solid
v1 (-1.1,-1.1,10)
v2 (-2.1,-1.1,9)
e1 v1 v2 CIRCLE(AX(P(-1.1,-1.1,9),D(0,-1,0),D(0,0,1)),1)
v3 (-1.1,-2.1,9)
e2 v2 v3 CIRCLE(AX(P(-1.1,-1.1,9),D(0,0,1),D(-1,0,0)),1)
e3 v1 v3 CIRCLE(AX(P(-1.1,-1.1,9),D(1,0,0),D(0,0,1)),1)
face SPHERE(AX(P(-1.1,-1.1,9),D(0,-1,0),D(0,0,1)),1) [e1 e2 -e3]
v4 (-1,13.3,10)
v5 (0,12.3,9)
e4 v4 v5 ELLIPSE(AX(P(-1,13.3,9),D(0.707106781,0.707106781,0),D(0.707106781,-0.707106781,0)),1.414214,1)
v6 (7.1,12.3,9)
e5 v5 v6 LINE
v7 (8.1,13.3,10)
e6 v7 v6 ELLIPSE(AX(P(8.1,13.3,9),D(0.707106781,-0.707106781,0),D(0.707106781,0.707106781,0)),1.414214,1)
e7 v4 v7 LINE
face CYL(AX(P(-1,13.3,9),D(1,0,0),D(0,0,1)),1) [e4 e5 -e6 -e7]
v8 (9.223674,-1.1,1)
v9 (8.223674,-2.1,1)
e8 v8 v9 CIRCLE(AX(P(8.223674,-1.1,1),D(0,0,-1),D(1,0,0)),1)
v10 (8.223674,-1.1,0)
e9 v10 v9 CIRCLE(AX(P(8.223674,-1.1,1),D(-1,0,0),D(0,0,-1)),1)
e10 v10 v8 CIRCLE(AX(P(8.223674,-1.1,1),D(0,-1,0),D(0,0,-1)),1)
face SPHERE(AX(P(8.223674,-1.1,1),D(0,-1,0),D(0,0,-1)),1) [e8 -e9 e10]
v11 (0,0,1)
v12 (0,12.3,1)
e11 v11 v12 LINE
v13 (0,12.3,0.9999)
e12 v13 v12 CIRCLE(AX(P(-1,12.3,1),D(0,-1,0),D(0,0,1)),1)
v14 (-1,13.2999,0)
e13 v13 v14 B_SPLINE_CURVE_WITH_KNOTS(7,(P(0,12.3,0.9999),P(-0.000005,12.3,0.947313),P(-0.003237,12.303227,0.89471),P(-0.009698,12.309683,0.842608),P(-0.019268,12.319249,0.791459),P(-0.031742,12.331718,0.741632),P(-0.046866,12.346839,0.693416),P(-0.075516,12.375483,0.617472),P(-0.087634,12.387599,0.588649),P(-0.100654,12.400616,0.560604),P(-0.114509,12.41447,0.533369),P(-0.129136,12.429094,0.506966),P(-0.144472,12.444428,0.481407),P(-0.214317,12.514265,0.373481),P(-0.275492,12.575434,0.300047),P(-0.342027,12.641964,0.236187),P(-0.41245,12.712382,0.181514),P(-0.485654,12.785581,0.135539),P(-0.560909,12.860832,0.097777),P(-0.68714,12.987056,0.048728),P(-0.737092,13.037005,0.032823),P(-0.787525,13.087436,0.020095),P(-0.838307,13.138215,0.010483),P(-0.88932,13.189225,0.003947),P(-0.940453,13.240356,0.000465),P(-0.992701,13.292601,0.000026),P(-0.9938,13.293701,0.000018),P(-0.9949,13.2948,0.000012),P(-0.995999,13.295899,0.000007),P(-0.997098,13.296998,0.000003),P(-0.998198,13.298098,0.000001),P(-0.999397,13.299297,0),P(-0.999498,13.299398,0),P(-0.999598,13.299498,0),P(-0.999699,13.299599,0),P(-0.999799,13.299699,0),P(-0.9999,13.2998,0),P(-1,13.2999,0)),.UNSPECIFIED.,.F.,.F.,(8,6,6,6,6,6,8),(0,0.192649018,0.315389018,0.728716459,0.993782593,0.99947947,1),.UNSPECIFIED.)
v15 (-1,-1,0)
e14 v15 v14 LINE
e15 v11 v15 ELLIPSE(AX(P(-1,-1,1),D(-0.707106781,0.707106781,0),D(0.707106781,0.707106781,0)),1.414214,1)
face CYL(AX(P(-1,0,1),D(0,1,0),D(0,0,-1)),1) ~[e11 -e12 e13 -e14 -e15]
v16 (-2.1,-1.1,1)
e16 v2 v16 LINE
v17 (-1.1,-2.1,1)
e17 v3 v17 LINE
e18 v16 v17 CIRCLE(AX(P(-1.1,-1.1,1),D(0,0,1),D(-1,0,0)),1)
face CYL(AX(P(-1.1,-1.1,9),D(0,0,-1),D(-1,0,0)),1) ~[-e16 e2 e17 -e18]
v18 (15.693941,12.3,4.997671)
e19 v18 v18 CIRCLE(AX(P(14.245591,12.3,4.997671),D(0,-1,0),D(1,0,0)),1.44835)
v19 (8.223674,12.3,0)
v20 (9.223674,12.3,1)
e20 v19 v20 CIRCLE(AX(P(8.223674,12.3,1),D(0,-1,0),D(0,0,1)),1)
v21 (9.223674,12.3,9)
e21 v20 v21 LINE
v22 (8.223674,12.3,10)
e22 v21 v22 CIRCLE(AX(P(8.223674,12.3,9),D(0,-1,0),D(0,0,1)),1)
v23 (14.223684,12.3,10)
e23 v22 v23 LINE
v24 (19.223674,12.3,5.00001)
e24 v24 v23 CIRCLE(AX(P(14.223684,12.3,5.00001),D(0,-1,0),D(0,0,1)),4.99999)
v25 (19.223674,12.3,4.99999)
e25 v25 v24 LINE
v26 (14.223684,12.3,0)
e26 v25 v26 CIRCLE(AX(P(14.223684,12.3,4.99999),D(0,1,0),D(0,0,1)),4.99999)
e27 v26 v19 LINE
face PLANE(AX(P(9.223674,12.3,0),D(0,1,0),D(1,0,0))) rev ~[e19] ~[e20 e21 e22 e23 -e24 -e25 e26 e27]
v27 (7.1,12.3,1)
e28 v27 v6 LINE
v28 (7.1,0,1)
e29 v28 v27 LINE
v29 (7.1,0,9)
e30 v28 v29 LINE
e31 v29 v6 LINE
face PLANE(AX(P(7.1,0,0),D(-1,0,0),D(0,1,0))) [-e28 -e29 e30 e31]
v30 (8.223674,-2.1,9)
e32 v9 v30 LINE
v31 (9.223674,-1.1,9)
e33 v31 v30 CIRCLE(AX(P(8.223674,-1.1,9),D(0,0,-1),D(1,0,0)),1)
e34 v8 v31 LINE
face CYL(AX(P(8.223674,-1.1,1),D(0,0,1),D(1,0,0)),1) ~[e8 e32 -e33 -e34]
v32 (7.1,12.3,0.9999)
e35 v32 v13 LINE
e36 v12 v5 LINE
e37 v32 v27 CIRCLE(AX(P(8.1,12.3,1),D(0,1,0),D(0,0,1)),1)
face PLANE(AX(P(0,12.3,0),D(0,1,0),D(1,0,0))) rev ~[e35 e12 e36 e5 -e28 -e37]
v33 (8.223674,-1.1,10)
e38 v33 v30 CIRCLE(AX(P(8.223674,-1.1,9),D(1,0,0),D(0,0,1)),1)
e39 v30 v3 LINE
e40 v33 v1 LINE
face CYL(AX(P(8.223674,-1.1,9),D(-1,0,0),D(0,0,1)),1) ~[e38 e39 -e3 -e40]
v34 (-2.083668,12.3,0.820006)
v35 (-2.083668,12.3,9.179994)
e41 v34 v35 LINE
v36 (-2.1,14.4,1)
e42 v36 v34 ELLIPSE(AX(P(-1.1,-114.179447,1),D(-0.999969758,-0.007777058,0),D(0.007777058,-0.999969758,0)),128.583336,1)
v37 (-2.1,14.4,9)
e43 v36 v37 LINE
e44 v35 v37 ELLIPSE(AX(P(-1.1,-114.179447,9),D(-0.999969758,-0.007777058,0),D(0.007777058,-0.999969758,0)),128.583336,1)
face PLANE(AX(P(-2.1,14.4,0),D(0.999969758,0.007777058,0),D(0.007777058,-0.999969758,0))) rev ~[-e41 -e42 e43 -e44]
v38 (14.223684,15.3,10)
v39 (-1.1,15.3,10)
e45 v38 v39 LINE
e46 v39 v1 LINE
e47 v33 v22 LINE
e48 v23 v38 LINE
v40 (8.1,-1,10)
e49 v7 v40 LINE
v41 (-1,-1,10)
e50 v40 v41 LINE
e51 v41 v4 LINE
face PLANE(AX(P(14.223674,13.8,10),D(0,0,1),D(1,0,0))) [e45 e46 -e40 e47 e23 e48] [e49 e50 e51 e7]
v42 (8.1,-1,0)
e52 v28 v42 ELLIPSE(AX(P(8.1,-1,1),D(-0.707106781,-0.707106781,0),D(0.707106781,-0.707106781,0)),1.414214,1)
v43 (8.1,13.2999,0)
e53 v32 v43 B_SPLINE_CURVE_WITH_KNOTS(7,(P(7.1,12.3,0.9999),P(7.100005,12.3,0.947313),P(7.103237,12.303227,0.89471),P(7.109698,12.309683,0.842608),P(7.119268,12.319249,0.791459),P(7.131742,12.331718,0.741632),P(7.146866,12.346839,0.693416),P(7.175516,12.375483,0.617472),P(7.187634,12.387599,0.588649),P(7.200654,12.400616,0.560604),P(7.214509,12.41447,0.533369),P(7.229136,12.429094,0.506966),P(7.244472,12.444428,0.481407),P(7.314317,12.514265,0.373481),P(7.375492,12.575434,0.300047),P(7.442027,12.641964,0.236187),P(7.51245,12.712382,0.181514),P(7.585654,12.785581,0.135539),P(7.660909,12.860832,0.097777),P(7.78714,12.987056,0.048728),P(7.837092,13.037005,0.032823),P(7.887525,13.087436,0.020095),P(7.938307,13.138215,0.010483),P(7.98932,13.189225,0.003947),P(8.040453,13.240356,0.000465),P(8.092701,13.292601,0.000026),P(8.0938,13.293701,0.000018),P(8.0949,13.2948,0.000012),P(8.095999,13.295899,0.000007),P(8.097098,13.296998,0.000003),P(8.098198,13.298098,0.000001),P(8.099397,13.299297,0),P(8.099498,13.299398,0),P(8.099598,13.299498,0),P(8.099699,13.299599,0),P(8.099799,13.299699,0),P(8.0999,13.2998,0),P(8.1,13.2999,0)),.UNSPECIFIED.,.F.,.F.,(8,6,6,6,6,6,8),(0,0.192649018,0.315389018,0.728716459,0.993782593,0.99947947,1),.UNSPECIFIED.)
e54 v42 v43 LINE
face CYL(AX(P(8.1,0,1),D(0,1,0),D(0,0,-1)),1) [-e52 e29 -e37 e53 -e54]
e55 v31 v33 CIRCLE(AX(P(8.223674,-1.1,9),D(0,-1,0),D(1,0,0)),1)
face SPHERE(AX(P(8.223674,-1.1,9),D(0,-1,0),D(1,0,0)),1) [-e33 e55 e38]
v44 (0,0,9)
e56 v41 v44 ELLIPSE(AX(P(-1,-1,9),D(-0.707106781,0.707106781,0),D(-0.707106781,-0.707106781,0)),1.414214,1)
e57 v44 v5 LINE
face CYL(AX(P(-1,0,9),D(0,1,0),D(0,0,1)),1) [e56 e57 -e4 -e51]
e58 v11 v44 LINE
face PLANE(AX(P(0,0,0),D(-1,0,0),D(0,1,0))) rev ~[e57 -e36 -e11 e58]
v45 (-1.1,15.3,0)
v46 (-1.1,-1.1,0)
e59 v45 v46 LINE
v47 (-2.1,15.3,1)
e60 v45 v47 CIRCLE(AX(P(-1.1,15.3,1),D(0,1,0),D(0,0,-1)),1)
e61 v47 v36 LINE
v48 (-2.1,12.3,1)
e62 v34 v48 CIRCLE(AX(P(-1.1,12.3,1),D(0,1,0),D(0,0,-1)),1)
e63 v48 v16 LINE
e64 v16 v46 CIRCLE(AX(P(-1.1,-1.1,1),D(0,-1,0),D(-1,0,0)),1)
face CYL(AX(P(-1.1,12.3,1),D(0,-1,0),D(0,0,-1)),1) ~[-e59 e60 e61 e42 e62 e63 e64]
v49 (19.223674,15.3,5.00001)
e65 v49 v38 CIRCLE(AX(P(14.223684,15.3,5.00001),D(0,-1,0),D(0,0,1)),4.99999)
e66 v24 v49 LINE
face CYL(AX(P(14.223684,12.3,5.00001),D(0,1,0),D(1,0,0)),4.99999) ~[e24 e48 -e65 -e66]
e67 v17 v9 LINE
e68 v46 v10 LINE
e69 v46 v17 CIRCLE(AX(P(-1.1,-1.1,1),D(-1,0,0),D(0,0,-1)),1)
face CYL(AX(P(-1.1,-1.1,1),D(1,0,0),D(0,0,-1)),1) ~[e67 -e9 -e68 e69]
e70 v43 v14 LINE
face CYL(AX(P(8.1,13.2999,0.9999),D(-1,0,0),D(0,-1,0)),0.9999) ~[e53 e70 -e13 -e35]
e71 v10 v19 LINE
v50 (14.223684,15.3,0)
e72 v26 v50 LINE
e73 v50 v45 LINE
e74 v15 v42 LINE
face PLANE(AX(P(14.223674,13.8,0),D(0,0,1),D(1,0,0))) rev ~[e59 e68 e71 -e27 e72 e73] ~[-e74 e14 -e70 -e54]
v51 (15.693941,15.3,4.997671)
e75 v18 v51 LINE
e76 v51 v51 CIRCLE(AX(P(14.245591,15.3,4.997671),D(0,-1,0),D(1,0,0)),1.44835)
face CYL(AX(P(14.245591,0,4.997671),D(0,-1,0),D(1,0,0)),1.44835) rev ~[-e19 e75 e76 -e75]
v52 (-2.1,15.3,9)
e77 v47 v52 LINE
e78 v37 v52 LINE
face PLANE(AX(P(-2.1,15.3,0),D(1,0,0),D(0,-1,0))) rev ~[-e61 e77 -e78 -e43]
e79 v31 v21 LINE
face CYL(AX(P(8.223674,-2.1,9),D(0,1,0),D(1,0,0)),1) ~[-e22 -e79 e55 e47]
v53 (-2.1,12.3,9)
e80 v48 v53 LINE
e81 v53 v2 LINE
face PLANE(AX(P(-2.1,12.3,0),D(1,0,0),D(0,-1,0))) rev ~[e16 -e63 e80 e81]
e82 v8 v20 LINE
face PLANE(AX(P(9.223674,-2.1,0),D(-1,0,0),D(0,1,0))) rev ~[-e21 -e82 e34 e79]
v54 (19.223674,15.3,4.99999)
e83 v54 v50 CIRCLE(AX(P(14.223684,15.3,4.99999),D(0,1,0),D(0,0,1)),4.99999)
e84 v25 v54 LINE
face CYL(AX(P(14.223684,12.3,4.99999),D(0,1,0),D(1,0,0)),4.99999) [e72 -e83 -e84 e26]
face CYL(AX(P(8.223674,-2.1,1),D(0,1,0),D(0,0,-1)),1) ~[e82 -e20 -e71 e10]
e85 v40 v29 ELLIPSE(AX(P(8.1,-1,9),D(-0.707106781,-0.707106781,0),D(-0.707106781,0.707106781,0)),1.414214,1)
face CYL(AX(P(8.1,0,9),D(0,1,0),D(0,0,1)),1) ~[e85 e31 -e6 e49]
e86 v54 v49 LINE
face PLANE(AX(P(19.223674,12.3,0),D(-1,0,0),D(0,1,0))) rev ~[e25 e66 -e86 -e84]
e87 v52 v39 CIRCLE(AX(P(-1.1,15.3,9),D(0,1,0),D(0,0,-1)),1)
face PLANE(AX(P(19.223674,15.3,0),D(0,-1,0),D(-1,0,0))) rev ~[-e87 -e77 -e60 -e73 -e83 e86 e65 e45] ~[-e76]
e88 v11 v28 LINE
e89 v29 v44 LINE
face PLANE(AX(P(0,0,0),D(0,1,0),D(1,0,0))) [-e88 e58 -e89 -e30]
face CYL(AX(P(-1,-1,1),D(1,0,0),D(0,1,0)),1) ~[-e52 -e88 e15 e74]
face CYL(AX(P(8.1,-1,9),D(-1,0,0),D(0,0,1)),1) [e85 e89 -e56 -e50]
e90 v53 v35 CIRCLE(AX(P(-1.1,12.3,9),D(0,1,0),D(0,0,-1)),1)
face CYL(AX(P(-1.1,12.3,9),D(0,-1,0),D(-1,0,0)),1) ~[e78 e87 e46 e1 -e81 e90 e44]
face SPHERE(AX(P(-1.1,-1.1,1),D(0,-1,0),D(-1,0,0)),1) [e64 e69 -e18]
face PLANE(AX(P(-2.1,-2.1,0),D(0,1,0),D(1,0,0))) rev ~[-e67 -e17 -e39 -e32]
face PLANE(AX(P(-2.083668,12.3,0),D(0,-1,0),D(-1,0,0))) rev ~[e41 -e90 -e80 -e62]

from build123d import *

# Parameters (mm, degrees)
F0_W      = 10
F0_H      = 3
F0_W_2    = 7.1
F0_H_2    = 12.3
F1_DEPTH  = 10
F2_R      = 1.4483503842
F1_FACE_W = 21.323674424
F1_FACE_H = 10
F3_DEPTH  = 15.301
F4_R      = 4.99999
F5_F1_R   = 1
F5_F2_R   = 1
F5_F3_R   = 1
F5_F4_R   = 1
F5_F5_R   = 1
F5_F6_R   = 1
F5_F7_R   = 1
F5_F8_R   = 1
F5_F9_R   = 1
F5_F10_R  = 0.9999
F5_F11_R  = 1
F5_F12_R  = 1
F5_F13_R  = 1


# Not quite as in the source:
# - a fillet or chamfer is up to 0.001 mm smaller than in the source, because OpenCascade refuses the exact size


with BuildPart() as f1:
    # F0 (on Top) → F1 (new body)
    with BuildSketch(Plane.XY):
        with Locations((14.223674424, 13.8)):
            Rectangle(F0_W, F0_H)
        Polygon((-2.1, 12.3), (-2.1, 0), (-2.1, -2.1), (7.1, -2.1), (9.223674424, -2.1), (9.223674424, 12.3), (9.223674424, 15.3), (-2.1, 15.3), (-2.1, 14.4), (-2.0836676853, 12.3), align=None)
        with Locations((3.55, 6.15)):
            Rectangle(F0_W_2, F0_H_2, mode=Mode.SUBTRACT)
    extrude(amount=F1_DEPTH)

    # F2 (on Front) + F1_face (on face) → F3 (cut, through all)
    with BuildSketch(Plane.XZ):
        with Locations((14.2455906607, 4.9976706505)):
            Circle(F2_R)
    with BuildSketch(Plane(origin=(8.561837212, 15.3, 5), x_dir=(-1, 0, 0), z_dir=(0, 1, 0))):
        Rectangle(F1_FACE_W, F1_FACE_H)
    extrude(amount=-F3_DEPTH, dir=(0, -1, 0), mode=Mode.SUBTRACT)

    # F4 (radius 5 in the source; OpenCascade refuses exactly that, so slightly less here)
    f4_edges = [f1.edges().sort_by_distance(p)[0] for p in [
        (19.223674, 13.8, 10),
        (19.223674, 13.8, 0),
    ]]
    fillet(f4_edges, radius=F4_R)

    # F5: fillet of radius 1 on 18 edges, made by hand

    # F5_f1
    f5_f1_edges = [f1.edges().sort_by_distance(p)[0] for p in [
        (9.223674424, 5.1, 0),
    ]]
    fillet(f5_f1_edges, radius=F5_F1_R)

    # F5_f2
    f5_f2_edges = [f1.edges().sort_by_distance(p)[0] for p in [
        (-2.1, 5.1, 0),
    ]]
    fillet(f5_f2_edges, radius=F5_F2_R)

    # F5_f3
    f5_f3_edges = [f1.edges().sort_by_distance(p)[0] for p in [
        (9.223674424, 5.1, 10),
    ]]
    fillet(f5_f3_edges, radius=F5_F3_R)

    # F5_f4
    f5_f4_edges = [f1.edges().sort_by_distance(p)[0] for p in [
        (-2.1, 5.1, 10),
    ]]
    fillet(f5_f4_edges, radius=F5_F4_R)

    # F5_f5
    f5_f5_edges = [f1.edges().sort_by_distance(p)[0] for p in [
        (0, 6.15, 0),
    ]]
    fillet(f5_f5_edges, radius=F5_F5_R)

    # F5_f6
    f5_f6_edges = [f1.edges().sort_by_distance(p)[0] for p in [
        (7.1, 6.15, 0),
    ]]
    fillet(f5_f6_edges, radius=F5_F6_R)

    # F5_f7
    f5_f7_edges = [f1.edges().sort_by_distance(p)[0] for p in [
        (0, 6.15, 10),
    ]]
    fillet(f5_f7_edges, radius=F5_F7_R)

    # F5_f8
    f5_f8_edges = [f1.edges().sort_by_distance(p)[0] for p in [
        (7.1, 6.15, 10),
    ]]
    fillet(f5_f8_edges, radius=F5_F8_R)

    # F5_f9
    f5_f9_edges = [f1.edges().sort_by_distance(p)[0] for p in [
        (3.561837212, -2.1, 0),
    ]]
    fillet(f5_f9_edges, radius=F5_F9_R)

    # F5_f10 (radius 1 in the source; OpenCascade refuses exactly that, so slightly less here)
    f5_f10_edges = [f1.edges().sort_by_distance(p)[0] for p in [
        (3.55, 12.3, 0),
    ]]
    fillet(f5_f10_edges, radius=F5_F10_R)

    # F5_f11
    f5_f11_edges = [f1.edges().sort_by_distance(p)[0] for p in [
        (3.55, 0, 0),
    ]]
    fillet(f5_f11_edges, radius=F5_F11_R)

    # F5_f12
    f5_f12_edges = [f1.edges().sort_by_distance(p)[0] for p in [
        (3.55, 12.3, 10),
    ]]
    fillet(f5_f12_edges, radius=F5_F12_R)

    # F5_f13
    f5_f13_edges = [f1.edges().sort_by_distance(p)[0] for p in [
        (3.55, 0, 10),
    ]]
    fillet(f5_f13_edges, radius=F5_F13_R)


solid = f1.part
